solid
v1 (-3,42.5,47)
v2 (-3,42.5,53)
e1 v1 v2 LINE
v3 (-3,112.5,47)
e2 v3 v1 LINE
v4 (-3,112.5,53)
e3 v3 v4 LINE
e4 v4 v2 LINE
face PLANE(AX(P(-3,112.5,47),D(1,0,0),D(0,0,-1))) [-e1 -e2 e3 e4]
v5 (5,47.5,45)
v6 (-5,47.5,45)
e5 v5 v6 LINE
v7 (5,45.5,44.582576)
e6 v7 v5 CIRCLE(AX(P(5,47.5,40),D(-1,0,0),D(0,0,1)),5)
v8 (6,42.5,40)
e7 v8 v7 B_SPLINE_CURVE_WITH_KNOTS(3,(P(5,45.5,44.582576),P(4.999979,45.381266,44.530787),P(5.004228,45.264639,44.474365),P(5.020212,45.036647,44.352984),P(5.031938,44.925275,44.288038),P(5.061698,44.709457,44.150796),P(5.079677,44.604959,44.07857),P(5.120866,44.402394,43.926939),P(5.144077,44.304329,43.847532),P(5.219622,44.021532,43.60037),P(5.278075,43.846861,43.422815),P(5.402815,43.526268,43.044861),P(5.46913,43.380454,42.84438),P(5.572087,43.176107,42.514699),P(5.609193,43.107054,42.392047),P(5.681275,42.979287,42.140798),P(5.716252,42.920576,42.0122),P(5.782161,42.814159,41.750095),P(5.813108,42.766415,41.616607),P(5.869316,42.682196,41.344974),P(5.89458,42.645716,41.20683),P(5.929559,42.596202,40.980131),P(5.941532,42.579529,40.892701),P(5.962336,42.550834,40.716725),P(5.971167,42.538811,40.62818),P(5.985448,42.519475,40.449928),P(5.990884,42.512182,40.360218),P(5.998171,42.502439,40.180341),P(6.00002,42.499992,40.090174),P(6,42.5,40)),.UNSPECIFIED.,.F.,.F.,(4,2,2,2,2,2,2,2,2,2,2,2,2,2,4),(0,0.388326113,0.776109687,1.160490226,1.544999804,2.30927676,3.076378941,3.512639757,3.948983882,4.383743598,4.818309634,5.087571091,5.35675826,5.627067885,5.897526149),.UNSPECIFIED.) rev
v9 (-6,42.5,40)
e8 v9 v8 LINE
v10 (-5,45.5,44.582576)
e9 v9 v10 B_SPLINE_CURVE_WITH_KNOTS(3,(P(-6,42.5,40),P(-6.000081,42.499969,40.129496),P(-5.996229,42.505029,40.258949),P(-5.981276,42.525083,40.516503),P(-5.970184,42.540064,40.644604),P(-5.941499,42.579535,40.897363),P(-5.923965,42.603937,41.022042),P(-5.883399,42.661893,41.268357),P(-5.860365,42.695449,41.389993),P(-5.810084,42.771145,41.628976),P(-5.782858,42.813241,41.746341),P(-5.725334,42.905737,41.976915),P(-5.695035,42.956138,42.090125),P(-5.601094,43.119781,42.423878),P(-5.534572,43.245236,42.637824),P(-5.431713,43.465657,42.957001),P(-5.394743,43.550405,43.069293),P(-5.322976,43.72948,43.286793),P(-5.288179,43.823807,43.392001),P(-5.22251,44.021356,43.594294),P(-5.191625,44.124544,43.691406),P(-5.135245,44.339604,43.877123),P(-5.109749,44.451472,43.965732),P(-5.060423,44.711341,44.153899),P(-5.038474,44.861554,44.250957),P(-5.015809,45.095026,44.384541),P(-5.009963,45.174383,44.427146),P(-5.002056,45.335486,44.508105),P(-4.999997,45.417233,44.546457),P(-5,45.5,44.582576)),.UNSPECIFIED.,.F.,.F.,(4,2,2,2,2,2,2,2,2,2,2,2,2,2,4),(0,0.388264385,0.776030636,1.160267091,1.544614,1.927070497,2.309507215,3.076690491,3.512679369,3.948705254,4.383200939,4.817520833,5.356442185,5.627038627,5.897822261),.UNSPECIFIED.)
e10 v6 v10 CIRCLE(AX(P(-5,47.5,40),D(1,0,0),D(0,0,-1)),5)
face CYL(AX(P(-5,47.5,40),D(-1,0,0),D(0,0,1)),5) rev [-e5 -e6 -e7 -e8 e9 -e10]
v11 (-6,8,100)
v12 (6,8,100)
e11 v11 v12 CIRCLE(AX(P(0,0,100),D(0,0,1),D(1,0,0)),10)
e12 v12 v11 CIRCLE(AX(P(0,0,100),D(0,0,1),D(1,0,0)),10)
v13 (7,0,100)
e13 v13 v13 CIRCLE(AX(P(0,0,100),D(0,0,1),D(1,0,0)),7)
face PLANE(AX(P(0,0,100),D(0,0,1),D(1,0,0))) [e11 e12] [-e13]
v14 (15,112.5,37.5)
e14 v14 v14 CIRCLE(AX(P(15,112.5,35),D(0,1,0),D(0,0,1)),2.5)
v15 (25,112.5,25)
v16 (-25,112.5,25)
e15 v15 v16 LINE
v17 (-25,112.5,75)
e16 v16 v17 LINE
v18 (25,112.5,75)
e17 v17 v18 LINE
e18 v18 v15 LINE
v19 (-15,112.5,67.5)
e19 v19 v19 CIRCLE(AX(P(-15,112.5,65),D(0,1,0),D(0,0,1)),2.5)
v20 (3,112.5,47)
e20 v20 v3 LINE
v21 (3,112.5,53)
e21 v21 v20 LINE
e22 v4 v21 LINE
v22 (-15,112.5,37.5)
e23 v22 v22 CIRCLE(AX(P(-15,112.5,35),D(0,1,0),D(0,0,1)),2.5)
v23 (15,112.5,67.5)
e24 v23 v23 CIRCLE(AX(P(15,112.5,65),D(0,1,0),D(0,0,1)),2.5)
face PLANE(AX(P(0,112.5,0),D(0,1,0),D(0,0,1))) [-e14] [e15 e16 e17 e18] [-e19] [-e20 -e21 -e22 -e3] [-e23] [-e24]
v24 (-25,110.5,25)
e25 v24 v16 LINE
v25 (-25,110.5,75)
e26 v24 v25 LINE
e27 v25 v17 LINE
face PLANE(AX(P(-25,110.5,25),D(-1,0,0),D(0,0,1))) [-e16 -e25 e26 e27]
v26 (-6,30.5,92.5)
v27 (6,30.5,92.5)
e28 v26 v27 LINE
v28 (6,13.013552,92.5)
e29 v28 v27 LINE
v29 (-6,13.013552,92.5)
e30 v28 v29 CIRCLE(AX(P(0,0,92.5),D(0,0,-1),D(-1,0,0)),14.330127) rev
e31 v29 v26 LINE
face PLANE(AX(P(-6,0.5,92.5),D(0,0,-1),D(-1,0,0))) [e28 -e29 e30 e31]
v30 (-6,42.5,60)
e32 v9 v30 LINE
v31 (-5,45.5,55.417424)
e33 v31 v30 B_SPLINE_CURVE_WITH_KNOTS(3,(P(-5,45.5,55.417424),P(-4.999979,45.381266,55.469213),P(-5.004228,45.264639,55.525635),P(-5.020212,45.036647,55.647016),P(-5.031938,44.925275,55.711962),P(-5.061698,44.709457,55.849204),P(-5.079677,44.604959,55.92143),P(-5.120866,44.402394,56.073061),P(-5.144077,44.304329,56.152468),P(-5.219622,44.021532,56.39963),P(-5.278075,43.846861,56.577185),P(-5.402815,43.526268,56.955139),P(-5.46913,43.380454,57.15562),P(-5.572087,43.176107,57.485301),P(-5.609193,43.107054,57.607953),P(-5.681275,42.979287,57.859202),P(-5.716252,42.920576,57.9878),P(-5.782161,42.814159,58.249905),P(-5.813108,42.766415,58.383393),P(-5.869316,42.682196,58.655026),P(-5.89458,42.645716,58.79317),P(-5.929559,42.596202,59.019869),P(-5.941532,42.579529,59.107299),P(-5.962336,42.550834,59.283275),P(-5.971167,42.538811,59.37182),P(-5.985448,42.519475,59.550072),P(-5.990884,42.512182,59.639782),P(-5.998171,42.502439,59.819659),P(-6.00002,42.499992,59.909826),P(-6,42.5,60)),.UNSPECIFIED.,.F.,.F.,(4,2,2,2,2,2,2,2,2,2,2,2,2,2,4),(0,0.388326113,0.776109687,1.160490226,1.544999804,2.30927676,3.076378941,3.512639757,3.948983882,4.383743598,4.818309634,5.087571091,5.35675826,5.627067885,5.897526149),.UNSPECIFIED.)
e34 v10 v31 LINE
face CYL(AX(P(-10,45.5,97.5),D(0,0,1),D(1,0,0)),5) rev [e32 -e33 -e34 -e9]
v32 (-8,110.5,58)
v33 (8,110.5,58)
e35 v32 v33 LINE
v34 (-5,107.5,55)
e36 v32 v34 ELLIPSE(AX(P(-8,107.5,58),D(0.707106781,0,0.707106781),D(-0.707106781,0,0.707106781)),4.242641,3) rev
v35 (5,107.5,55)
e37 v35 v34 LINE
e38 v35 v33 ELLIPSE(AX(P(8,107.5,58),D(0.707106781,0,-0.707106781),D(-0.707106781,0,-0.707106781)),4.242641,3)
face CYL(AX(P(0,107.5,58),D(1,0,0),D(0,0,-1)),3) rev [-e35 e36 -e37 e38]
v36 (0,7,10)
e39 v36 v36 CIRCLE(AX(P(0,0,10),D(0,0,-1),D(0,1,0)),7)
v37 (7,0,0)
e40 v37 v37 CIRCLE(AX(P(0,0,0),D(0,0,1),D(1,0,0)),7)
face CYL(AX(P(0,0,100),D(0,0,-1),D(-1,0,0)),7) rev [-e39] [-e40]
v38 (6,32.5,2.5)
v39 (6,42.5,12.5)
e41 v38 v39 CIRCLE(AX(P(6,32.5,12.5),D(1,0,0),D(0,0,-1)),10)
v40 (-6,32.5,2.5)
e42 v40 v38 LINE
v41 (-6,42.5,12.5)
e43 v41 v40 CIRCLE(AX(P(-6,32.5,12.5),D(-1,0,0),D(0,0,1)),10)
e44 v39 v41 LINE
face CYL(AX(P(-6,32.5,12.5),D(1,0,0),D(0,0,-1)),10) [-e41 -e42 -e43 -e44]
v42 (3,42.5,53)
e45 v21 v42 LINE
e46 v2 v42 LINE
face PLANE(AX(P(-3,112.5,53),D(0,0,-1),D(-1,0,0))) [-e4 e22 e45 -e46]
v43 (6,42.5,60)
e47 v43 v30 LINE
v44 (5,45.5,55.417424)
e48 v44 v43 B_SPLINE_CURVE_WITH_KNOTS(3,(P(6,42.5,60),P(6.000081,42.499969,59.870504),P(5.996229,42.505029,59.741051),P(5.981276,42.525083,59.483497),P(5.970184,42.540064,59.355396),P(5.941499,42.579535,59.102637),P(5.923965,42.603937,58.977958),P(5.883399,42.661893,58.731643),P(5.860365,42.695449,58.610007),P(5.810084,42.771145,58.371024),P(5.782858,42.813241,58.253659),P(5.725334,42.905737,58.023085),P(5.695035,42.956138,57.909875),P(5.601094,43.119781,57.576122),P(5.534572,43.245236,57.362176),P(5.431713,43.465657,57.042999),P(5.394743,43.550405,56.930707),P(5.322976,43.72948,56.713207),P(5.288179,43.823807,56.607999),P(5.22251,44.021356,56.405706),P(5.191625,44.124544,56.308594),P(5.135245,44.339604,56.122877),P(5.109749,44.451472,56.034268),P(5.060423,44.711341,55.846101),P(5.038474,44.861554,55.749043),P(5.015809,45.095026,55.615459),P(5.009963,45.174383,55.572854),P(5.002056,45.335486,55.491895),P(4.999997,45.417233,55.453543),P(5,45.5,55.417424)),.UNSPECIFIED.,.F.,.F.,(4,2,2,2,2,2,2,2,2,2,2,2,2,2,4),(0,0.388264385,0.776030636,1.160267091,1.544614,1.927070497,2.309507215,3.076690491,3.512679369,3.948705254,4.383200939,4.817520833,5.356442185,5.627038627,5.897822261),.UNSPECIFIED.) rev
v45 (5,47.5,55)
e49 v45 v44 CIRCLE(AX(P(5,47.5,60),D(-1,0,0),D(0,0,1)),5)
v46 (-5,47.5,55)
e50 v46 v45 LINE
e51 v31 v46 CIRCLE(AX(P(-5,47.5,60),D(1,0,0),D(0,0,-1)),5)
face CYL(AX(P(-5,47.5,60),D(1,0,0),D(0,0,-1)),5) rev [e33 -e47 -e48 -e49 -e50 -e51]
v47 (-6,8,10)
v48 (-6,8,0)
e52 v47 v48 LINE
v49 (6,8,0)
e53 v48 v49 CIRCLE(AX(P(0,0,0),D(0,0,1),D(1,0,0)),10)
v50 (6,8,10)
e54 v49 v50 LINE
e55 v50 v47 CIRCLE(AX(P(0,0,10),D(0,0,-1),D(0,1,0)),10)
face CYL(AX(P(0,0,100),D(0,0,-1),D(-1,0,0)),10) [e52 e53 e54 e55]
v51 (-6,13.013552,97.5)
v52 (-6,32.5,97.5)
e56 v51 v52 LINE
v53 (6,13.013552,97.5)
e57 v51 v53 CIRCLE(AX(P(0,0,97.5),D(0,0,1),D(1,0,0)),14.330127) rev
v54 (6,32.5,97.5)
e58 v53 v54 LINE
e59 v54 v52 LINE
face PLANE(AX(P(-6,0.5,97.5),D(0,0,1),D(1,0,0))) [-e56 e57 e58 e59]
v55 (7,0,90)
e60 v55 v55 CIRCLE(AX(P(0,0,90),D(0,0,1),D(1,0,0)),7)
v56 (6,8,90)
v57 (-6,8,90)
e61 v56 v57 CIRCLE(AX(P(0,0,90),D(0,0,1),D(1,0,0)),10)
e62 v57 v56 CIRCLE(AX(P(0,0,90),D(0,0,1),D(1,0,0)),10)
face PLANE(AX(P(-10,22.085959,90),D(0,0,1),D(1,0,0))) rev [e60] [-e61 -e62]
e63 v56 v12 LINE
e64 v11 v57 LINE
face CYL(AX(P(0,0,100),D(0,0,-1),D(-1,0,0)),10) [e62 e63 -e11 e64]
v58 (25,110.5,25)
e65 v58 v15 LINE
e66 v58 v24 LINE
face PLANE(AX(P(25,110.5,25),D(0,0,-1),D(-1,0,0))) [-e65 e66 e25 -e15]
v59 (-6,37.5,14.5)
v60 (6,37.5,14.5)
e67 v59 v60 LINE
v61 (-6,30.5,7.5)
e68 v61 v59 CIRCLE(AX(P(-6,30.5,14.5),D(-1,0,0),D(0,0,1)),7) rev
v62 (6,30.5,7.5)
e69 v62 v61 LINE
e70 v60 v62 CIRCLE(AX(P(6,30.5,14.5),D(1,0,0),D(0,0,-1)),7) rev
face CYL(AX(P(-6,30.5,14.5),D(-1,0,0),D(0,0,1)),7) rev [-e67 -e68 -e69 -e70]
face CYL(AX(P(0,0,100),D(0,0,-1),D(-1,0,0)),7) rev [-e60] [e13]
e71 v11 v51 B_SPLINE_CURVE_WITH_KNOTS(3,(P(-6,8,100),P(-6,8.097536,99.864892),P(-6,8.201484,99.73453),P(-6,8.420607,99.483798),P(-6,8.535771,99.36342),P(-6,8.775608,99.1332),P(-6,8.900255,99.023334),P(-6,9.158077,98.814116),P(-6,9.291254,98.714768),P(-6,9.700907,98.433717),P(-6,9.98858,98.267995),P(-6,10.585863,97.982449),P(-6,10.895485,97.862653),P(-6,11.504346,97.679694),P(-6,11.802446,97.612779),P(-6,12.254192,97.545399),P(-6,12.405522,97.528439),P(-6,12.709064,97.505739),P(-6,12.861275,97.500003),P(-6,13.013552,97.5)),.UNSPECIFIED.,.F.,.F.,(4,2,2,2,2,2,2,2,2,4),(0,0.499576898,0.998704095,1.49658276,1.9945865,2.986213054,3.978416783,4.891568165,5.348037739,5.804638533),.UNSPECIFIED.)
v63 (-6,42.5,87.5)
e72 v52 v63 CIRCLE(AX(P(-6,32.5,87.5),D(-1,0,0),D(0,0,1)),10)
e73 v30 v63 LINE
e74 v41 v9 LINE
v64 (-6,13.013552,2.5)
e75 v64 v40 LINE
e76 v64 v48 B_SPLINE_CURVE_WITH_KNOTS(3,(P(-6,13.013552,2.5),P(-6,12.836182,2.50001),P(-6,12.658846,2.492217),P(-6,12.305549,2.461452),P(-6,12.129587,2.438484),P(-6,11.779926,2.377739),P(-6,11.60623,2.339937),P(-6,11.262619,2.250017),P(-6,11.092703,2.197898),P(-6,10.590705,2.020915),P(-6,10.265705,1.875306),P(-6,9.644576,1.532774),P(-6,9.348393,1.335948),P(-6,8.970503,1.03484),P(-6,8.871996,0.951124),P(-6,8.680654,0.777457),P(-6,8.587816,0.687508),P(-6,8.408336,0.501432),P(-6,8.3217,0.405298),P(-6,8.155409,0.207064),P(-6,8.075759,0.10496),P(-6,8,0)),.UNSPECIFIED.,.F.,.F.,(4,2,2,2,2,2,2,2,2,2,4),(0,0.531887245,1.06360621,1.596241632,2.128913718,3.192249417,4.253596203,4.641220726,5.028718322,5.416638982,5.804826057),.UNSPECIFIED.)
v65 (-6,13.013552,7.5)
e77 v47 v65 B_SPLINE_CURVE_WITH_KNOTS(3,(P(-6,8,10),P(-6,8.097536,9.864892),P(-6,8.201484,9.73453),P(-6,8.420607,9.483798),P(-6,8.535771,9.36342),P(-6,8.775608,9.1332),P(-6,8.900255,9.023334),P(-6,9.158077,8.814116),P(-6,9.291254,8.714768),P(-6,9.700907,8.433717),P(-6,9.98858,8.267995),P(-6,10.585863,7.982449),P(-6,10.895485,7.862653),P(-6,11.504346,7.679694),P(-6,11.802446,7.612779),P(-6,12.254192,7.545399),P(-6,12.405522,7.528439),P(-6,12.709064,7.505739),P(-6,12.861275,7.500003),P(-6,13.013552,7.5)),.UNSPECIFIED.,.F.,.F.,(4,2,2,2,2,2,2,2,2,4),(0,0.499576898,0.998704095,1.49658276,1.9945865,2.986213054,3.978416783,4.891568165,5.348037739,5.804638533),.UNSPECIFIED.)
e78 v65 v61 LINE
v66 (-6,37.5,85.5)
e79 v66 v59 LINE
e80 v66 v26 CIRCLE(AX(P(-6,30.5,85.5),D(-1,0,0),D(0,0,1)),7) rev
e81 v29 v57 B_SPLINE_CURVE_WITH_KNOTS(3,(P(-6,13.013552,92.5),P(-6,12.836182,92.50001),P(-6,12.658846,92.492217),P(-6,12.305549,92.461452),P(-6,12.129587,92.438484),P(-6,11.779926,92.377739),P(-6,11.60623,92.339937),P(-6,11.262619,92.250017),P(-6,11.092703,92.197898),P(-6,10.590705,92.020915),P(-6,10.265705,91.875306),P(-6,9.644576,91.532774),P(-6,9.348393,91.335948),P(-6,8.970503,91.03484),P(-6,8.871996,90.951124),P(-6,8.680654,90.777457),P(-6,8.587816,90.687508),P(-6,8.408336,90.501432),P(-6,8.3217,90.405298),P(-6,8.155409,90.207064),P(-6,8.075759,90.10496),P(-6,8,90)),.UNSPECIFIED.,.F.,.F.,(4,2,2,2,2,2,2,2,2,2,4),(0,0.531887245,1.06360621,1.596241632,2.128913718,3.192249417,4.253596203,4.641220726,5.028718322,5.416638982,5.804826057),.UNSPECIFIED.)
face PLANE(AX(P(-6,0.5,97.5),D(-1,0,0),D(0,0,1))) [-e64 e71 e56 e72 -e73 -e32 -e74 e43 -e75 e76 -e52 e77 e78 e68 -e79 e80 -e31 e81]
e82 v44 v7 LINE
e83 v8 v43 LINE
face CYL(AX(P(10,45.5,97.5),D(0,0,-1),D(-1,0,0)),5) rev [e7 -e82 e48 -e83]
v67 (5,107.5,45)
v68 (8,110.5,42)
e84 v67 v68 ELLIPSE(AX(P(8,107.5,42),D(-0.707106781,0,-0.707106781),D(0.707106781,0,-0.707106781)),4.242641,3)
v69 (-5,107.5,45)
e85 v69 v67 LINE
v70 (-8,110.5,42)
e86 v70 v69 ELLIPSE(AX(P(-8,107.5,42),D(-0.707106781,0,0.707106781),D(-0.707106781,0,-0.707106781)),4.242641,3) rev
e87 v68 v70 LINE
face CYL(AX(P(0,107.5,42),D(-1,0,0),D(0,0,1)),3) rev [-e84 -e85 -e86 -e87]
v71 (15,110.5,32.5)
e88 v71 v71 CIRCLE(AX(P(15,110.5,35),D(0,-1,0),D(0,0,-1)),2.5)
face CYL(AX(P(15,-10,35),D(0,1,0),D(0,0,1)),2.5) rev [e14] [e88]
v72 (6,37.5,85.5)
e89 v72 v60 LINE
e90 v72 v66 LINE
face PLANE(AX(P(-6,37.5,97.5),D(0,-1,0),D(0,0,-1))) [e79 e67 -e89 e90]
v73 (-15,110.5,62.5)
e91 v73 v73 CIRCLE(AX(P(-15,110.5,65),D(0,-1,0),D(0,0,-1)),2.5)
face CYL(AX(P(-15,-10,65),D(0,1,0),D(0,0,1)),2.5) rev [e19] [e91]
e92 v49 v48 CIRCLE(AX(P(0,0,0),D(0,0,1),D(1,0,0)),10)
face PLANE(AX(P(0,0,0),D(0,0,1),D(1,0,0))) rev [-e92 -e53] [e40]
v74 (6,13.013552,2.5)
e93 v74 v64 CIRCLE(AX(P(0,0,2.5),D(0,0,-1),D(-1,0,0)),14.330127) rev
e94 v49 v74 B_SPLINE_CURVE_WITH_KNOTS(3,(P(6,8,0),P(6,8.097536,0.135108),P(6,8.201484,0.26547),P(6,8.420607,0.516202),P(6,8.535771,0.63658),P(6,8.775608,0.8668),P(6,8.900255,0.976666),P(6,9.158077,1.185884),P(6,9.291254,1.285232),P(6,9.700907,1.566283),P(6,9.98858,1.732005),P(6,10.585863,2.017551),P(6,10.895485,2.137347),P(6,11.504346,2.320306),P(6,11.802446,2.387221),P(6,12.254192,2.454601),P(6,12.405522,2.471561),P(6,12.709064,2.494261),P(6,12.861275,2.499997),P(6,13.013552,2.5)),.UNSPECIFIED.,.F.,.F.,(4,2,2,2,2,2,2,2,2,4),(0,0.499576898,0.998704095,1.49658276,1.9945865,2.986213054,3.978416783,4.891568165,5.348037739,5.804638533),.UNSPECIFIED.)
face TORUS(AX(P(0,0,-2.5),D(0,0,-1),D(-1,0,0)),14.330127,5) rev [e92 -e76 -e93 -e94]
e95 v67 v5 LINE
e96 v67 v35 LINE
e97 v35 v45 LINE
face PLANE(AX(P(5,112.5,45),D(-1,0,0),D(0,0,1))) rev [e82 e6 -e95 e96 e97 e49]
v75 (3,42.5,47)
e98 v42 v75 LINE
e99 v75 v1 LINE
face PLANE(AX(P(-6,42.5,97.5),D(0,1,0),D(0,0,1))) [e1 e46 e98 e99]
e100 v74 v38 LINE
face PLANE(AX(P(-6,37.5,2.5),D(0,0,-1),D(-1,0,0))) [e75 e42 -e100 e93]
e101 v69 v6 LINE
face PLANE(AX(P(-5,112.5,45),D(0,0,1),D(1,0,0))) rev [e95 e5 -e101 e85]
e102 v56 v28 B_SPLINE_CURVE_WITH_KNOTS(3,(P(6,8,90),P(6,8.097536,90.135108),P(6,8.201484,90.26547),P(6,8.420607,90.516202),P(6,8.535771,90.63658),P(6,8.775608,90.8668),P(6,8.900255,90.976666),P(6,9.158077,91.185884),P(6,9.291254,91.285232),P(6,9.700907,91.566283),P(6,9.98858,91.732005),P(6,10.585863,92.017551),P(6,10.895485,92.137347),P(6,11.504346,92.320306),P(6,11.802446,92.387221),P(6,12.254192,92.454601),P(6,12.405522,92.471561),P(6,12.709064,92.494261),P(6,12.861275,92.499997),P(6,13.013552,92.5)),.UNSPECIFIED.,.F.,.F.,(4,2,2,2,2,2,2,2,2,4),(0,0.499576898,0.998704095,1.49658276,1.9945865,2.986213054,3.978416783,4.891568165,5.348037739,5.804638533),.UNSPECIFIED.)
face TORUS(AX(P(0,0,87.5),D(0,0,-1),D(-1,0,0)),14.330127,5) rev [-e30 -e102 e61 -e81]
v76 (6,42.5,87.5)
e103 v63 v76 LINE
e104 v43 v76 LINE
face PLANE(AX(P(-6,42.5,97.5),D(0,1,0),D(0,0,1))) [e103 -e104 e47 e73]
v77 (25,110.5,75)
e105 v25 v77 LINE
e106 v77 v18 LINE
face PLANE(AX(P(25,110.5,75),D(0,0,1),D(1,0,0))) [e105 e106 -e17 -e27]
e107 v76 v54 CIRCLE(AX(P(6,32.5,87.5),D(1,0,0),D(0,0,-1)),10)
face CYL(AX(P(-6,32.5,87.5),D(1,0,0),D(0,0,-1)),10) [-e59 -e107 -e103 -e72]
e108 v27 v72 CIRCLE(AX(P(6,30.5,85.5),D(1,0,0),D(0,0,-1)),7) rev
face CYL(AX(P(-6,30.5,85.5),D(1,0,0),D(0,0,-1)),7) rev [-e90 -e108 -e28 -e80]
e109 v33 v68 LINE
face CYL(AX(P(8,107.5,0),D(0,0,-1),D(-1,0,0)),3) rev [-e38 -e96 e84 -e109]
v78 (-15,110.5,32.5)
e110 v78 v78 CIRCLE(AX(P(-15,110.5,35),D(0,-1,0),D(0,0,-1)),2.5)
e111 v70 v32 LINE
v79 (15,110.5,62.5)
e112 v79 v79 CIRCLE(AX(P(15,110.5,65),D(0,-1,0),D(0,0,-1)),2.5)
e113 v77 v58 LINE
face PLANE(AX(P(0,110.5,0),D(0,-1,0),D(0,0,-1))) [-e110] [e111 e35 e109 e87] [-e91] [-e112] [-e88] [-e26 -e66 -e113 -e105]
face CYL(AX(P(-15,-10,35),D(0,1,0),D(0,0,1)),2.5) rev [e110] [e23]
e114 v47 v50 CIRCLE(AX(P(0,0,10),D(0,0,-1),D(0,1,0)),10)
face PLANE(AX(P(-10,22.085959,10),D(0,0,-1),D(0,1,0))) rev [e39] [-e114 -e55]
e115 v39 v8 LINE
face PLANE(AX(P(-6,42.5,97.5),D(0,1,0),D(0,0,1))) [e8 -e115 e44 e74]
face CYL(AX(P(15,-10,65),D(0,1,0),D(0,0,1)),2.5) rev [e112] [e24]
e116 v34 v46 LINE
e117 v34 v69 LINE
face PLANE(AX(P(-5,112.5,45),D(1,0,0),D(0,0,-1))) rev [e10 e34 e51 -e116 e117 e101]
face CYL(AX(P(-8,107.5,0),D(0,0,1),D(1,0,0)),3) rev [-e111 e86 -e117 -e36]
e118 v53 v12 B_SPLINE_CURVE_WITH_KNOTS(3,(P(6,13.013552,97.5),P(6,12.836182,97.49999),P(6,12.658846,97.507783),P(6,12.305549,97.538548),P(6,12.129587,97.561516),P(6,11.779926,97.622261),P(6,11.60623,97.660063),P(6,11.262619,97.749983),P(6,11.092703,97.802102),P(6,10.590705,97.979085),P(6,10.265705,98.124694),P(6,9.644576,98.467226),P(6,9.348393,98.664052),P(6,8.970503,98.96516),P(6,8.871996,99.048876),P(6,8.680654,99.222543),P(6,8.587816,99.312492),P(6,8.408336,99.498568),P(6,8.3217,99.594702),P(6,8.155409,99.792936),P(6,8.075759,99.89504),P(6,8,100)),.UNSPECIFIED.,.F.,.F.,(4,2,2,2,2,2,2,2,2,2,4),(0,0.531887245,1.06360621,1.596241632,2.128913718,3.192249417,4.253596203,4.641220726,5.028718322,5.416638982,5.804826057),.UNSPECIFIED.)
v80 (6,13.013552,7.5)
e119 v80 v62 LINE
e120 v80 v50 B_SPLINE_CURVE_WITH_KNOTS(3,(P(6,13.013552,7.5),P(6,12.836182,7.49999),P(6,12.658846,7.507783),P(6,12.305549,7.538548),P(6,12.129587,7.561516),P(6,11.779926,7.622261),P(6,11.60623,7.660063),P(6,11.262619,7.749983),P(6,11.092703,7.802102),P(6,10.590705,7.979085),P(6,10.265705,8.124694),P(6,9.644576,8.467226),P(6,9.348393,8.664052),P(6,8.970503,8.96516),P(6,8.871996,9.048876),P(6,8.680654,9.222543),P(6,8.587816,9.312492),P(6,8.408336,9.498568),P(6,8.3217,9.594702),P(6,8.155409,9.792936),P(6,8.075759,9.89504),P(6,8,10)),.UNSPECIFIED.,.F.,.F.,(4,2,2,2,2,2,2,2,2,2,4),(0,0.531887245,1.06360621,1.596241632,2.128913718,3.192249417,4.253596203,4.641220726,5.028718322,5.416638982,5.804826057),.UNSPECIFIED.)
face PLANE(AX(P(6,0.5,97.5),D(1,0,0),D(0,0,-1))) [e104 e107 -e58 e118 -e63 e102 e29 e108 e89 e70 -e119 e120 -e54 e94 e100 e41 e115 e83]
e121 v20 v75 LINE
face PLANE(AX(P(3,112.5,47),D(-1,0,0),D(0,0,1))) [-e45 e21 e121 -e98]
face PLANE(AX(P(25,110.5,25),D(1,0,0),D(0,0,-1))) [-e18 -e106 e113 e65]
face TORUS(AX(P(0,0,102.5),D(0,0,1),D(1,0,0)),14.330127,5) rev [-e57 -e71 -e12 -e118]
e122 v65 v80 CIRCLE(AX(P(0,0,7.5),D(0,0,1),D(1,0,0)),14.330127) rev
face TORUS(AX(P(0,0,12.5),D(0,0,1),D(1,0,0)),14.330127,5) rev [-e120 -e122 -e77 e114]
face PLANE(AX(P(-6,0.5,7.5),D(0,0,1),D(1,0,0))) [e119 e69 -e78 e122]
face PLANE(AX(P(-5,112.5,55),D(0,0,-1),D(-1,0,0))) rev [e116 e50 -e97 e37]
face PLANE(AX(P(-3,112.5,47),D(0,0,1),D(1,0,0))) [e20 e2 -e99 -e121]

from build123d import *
from OCP.BRepFilletAPI import BRepFilletAPI_MakeFillet

# Parameters (mm, degrees)
SKETCH1_R               = 10
SKETCH1_R_2             = 7
BOSS_EXTRUDE1_DEPTH     = 100
CUT_EXTRUDE1_DEPTH      = 101.995049384
CUT_EXTRUDE1_DEPTH_BACK = 101.995049384
SKETCH2_W               = 80
SKETCH2_H               = 53.3052099
SKETCH3_W               = 12
SKETCH3_H               = 5
BOSS_EXTRUDE2_DEPTH     = 37
CUT_EXTRUDE2_DEPTH      = 105
SKETCH5_W               = 95
SKETCH5_H               = 5
BOSS_EXTRUDE3_DEPTH     = 12
FILLET1_R1              = 10
FILLET1_R2              = 7
SKETCH6_W               = 10
SKETCH6_H               = 10
SKETCH6_W_2             = 6
SKETCH6_H_2             = 6
BOSS_EXTRUDE4_DEPTH     = 70
FILLET2_R               = 5
SKETCH7_W               = 50
SKETCH7_H               = 50
SKETCH7_W_2             = 10
SKETCH7_H_2             = 10
BOSS_EXTRUDE5_DEPTH     = 2
FILLET3_R               = 3
CUT_EXTRUDE3_DEPTH      = 161.097626528


with BuildPart() as part:
    # Sketch1 → Boss-Extrude1 (new body)
    with BuildSketch(Plane.XY):
        Circle(SKETCH1_R)
        Circle(SKETCH1_R_2, mode=Mode.SUBTRACT)
    extrude(amount=BOSS_EXTRUDE1_DEPTH)

    # Sketch2 → Cut-Extrude1 (cut, two sides: drawn at the far end of the back side and taken through both)
    with BuildSketch(Plane(origin=(0, 0, 0), x_dir=(0, 0, -1), z_dir=(1, 0, 0)).offset(-CUT_EXTRUDE1_DEPTH_BACK)):
        with Locations((-50, -4.566645708)):
            Rectangle(SKETCH2_W, SKETCH2_H)
    extrude(amount=CUT_EXTRUDE1_DEPTH + CUT_EXTRUDE1_DEPTH_BACK, mode=Mode.SUBTRACT)


with BuildPart() as cut_extrude1_piece_1:
    # of the separate pieces the step leaves, piece 1, a body of its own (cut_extrude1_pieces)
    add(part.part.solids().sort_by_distance((10, 0, 0))[0])



with BuildPart() as cut_extrude1_piece_2:
    # of the separate pieces the step leaves, piece 2, a body of its own (cut_extrude1_pieces)
    add(part.part.solids().sort_by_distance((10, 0, 90))[0])


with BuildPart() as cut_extrude1_piece_1_1:
    add(cut_extrude1_piece_1.part)

    add(cut_extrude1_piece_2.part)  # Boss-Extrude2 merges Cut-Extrude1 piece 2
    # Sketch3 → Boss-Extrude2 (add)
    with BuildSketch(Plane(origin=(0, 37.5, 0), x_dir=(1, 0, 0), z_dir=(0, 1, 0))):
        with Locations((0, -95)):
            Rectangle(SKETCH3_W, SKETCH3_H)
        with Locations((0, -5)):
            Rectangle(SKETCH3_W, SKETCH3_H)
    extrude(amount=-BOSS_EXTRUDE2_DEPTH)

    # Sketch4 → Cut-Extrude2 (cut)
    with BuildSketch(Plane.XY.offset(97.5)):
        with BuildLine():
            Line((-6, 0.5), (6, 0.5))
            Line((6, 0.5), (6, 3.605551275))
            ThreePointArc((6, 3.605551275), (0, 7), (-6, 3.605551275))
            Line((-6, 3.605551275), (-6, 0.5))
        make_face()
    extrude(amount=-CUT_EXTRUDE2_DEPTH, mode=Mode.SUBTRACT)

    # Sketch5 → Boss-Extrude3 (add)
    with BuildSketch(Plane(origin=(6, 0, 0), x_dir=(0, 0, -1), z_dir=(1, 0, 0))):
        with Locations((-50, 40)):
            Rectangle(SKETCH5_W, SKETCH5_H)
    extrude(amount=-BOSS_EXTRUDE3_DEPTH)

    # Fillet1: one fillet with a radius per group of edges: ONE call of the kernel's fillet builder (fillet() takes one radius for all edges)
    fillet1_edges_1 = [cut_extrude1_piece_1_1.edges().sort_by_distance(p)[0] for p in [
        (0, 42.5, 97.5),
        (0, 42.5, 2.5),
    ]]
    fillet1_edges_2 = [cut_extrude1_piece_1_1.edges().sort_by_distance(p)[0] for p in [
        (0, 37.5, 92.5),
        (0, 37.5, 7.5),
    ]]
    fillet1 = BRepFilletAPI_MakeFillet(cut_extrude1_piece_1_1.part.solid().wrapped)
    for e in fillet1_edges_1:
        fillet1.Add(FILLET1_R1, e.wrapped)
    for e in fillet1_edges_2:
        fillet1.Add(FILLET1_R2, e.wrapped)
    add(Compound.cast(fillet1.Shape()), mode=Mode.REPLACE)

    # Sketch6 → Boss-Extrude4 (add)
    with BuildSketch(Plane(origin=(0, 42.5, 0), x_dir=(1, 0, 0), z_dir=(0, 1, 0))):
        with Locations((0, -50)):
            Rectangle(SKETCH6_W, SKETCH6_H)
        with Locations((0, -50)):
            Rectangle(SKETCH6_W_2, SKETCH6_H_2, mode=Mode.SUBTRACT)
    extrude(amount=BOSS_EXTRUDE4_DEPTH)

    # Fillet2
    # the kernel refuses this fillet: 5 mm, written as the material it adds along each edge
    with BuildSketch(Plane(origin=(0, 0, 97.5), x_dir=(-0.9879298131416905, -0.15490217656903477, 0), z_dir=(0.15490217656903477, -0.9879298131416905, 0))) as fillet2_piece_1_section:
        with BuildLine():
            CenterArc((14.330127019, -5), FILLET2_R, 90, 60)
            Line((10, -2.5), (9.91339746, -2.45))
            ThreePointArc((9.91339746, -2.45), (9.9, -1.25), (9.9, 0))
            Line((9.9, 0), (10, 0.1))
            Line((10, 0.1), (14.330127019, 0.1))
            Line((14.330127019, 0.1), (14.330127019, 0))
        make_face()
    fillet2_piece_1 = revolve(axis=Axis((0, 0, 97.5), (0, 0, -1)), revolution_arc=197.822245722, mode=Mode.PRIVATE)
    fillet2_piece_1 = split(fillet2_piece_1, bisect_by=Plane(origin=(6, 10.469703394, 98.151254793), z_dir=(-1, 0, 0)), keep=Keep.TOP, mode=Mode.PRIVATE)
    fillet2_piece_1 = split(fillet2_piece_1, bisect_by=Plane(origin=(-6, 10.469703394, 98.151254793), z_dir=(1, 0, 0)), keep=Keep.TOP, mode=Mode.PRIVATE)
    add(fillet2_piece_1)
    with BuildSketch(Plane(origin=(0, 0, 92.5), x_dir=(-0.9879298131416903, -0.15490217656903651, 0), z_dir=(0.15490217656903651, -0.9879298131416903, 0))) as fillet2_piece_2_section:
        with BuildLine():
            CenterArc((14.330127019, 5), FILLET2_R, 210, 60)
            Line((14.330127019, 0), (14.330127019, -0.1))
            Line((14.330127019, -0.1), (10, -0.1))
            Line((10, -0.1), (9.9, 0))
            ThreePointArc((9.9, 0), (9.9, 1.25), (9.91339746, 2.45))
            Line((9.91339746, 2.45), (10, 2.5))
        make_face()
    fillet2_piece_2 = revolve(axis=Axis((0, 0, 92.5), (0, 0, -1)), revolution_arc=197.822245722, mode=Mode.PRIVATE)
    fillet2_piece_2 = split(fillet2_piece_2, bisect_by=Plane(origin=(6, 10.469703394, 91.848745207), z_dir=(-1, 0, 0)), keep=Keep.TOP, mode=Mode.PRIVATE)
    fillet2_piece_2 = split(fillet2_piece_2, bisect_by=Plane(origin=(-6, 10.469703394, 91.848745207), z_dir=(1, 0, 0)), keep=Keep.TOP, mode=Mode.PRIVATE)
    add(fillet2_piece_2)
    with BuildSketch(Plane(origin=(0, 0, 2.5), x_dir=(-0.98792981314169, -0.1549021765690374, 0), z_dir=(0.1549021765690374, -0.98792981314169, 0))) as fillet2_piece_3_section:
        with BuildLine():
            CenterArc((14.330127019, 5), FILLET2_R, 210, 60)
            Line((14.330127019, 0), (14.330127019, -0.1))
            Line((14.330127019, -0.1), (10, -0.1))
            Line((10, -0.1), (9.9, 0))
            ThreePointArc((9.9, 0), (9.9, 1.25), (9.91339746, 2.45))
            Line((9.91339746, 2.45), (10, 2.5))
        make_face()
    fillet2_piece_3 = revolve(axis=Axis((0, 0, 2.5), (0, 0, -1)), revolution_arc=197.822245722, mode=Mode.PRIVATE)
    fillet2_piece_3 = split(fillet2_piece_3, bisect_by=Plane(origin=(6, 10.469703394, 1.848745207), z_dir=(-1, 0, 0)), keep=Keep.TOP, mode=Mode.PRIVATE)
    fillet2_piece_3 = split(fillet2_piece_3, bisect_by=Plane(origin=(-6, 10.469703394, 1.848745207), z_dir=(1, 0, 0)), keep=Keep.TOP, mode=Mode.PRIVATE)
    add(fillet2_piece_3)
    with BuildSketch(Plane(origin=(0, 0, 7.5), x_dir=(-0.9879298131416905, -0.15490217656903565, 0), z_dir=(0.15490217656903565, -0.9879298131416905, 0))) as fillet2_piece_4_section:
        with BuildLine():
            CenterArc((14.330127019, -5), FILLET2_R, 90, 60)
            Line((10, -2.5), (9.91339746, -2.45))
            ThreePointArc((9.91339746, -2.45), (9.9, -1.25), (9.9, 0))
            Line((9.9, 0), (10, 0.1))
            Line((10, 0.1), (14.330127019, 0.1))
            Line((14.330127019, 0.1), (14.330127019, 0))
        make_face()
    fillet2_piece_4 = revolve(axis=Axis((0, 0, 7.5), (0, 0, -1)), revolution_arc=197.822245722, mode=Mode.PRIVATE)
    fillet2_piece_4 = split(fillet2_piece_4, bisect_by=Plane(origin=(6, 10.469703394, 8.151254793), z_dir=(-1, 0, 0)), keep=Keep.TOP, mode=Mode.PRIVATE)
    fillet2_piece_4 = split(fillet2_piece_4, bisect_by=Plane(origin=(-6, 10.469703394, 8.151254793), z_dir=(1, 0, 0)), keep=Keep.TOP, mode=Mode.PRIVATE)
    add(fillet2_piece_4)
    with BuildSketch(Plane(origin=(5, 42.5, 45), x_dir=(1, 0, 0), z_dir=(0, 0, 1)), Plane(origin=(-5, 42.5, 55), x_dir=(-1, 0, 0), z_dir=(0, 0, -1))) as fillet2_piece_5:
        with BuildLine():
            CenterArc((5, 3), FILLET2_R, 180, 36.869897646)
            Line((0, 3), (-0.1, 3))
            Line((-0.1, 3), (-0.1, 0))
            Line((-0.1, 0), (0, -0.1))
            ThreePointArc((0, -0.1), (0.5, -0.1), (0.92, -0.06))
            Line((0.92, -0.06), (1, 0))
        make_face()
    extrude(amount=10)
    with BuildSketch(Plane(origin=(5, 42.5, 55), x_dir=(0, 0, 1), z_dir=(-1, 0, 0)), Plane(origin=(-5, 42.5, 45), x_dir=(0, 0, -1), z_dir=(1, 0, 0))) as fillet2_piece_6:
        with BuildLine():
            CenterArc((FILLET2_R, FILLET2_R), FILLET2_R, 180, 90)
            Line((0, FILLET2_R), (-FILLET2_R * 0.02, FILLET2_R))
            Line((-FILLET2_R * 0.02, FILLET2_R), (-FILLET2_R * 0.02, -FILLET2_R * 0.02))
            Line((-FILLET2_R * 0.02, -FILLET2_R * 0.02), (FILLET2_R, -FILLET2_R * 0.02))
            Line((FILLET2_R, -FILLET2_R * 0.02), (FILLET2_R, 0))
        make_face()
    extrude(amount=10)
    with BuildSketch(Plane(origin=(5, 42.5, 37.5), x_dir=(1, 0, 0), z_dir=(0, 0, 1))) as fillet2_piece_7a_section:
        with BuildLine():
            CenterArc((5, 3), FILLET2_R, 180, 36.869897646)
            Line((0, 3), (-0.1, 3))
            Line((-0.1, 3), (-0.1, 0))
            Line((-0.1, 0), (0, -0.1))
            ThreePointArc((0, -0.1), (0.5, -0.1), (0.92, -0.06))
            Line((0.92, -0.06), (1, 0))
        make_face()
    fillet2_piece_7a = extrude(amount=17.5, mode=Mode.PRIVATE)
    fillet2_piece_7a = split(fillet2_piece_7a, bisect_by=Plane(origin=(5.226188398, 43.349672813, 45), z_dir=(0, 0, -1)), keep=Keep.TOP, mode=Mode.PRIVATE)
    with BuildSketch(Plane(origin=(-5, 42.5, 45), x_dir=(0, 0, -1), z_dir=(1, 0, 0))) as fillet2_piece_7b_section:
        with BuildLine():
            CenterArc((FILLET2_R, FILLET2_R), FILLET2_R, 180, 90)
            Line((0, FILLET2_R), (-FILLET2_R * 0.02, FILLET2_R))
            Line((-FILLET2_R * 0.02, FILLET2_R), (-FILLET2_R * 0.02, -FILLET2_R * 0.02))
            Line((-FILLET2_R * 0.02, -FILLET2_R * 0.02), (FILLET2_R, -FILLET2_R * 0.02))
            Line((FILLET2_R, -FILLET2_R * 0.02), (FILLET2_R, 0))
        make_face()
    fillet2_piece_7b = extrude(amount=22.5, mode=Mode.PRIVATE)
    fillet2_piece_7b = split(fillet2_piece_7b, bisect_by=Plane(origin=(6, 43.631975571, 43.868024429), z_dir=(-1, 0, 0)), keep=Keep.TOP, mode=Mode.PRIVATE)
    fillet2_piece_7b = split(fillet2_piece_7b, bisect_by=Plane(origin=(5, 43.631975571, 43.868024429), z_dir=(1, 0, 0)), keep=Keep.TOP, mode=Mode.PRIVATE)
    fillet2_piece_7 = fillet2_piece_7a & fillet2_piece_7b
    add(fillet2_piece_7)
    with BuildSketch(Plane(origin=(17.5, 42.5, 55), x_dir=(0, 0, 1), z_dir=(-1, 0, 0))) as fillet2_piece_8a_section:
        with BuildLine():
            CenterArc((FILLET2_R, FILLET2_R), FILLET2_R, 180, 90)
            Line((0, FILLET2_R), (-FILLET2_R * 0.02, FILLET2_R))
            Line((-FILLET2_R * 0.02, FILLET2_R), (-FILLET2_R * 0.02, -FILLET2_R * 0.02))
            Line((-FILLET2_R * 0.02, -FILLET2_R * 0.02), (FILLET2_R, -FILLET2_R * 0.02))
            Line((FILLET2_R, -FILLET2_R * 0.02), (FILLET2_R, 0))
        make_face()
    fillet2_piece_8a = extrude(amount=22.5, mode=Mode.PRIVATE)
    fillet2_piece_8a = split(fillet2_piece_8a, bisect_by=Plane(origin=(6, 43.631975571, 56.131975571), z_dir=(-1, 0, 0)), keep=Keep.TOP, mode=Mode.PRIVATE)
    fillet2_piece_8a = split(fillet2_piece_8a, bisect_by=Plane(origin=(5, 43.631975571, 56.131975571), z_dir=(1, 0, 0)), keep=Keep.TOP, mode=Mode.PRIVATE)
    with BuildSketch(Plane(origin=(5, 42.5, 45), x_dir=(1, 0, 0), z_dir=(0, 0, 1))) as fillet2_piece_8b_section:
        with BuildLine():
            CenterArc((5, 3), FILLET2_R, 180, 36.869897646)
            Line((0, 3), (-0.1, 3))
            Line((-0.1, 3), (-0.1, 0))
            Line((-0.1, 0), (0, -0.1))
            ThreePointArc((0, -0.1), (0.5, -0.1), (0.92, -0.06))
            Line((0.92, -0.06), (1, 0))
        make_face()
    fillet2_piece_8b = extrude(amount=17.5, mode=Mode.PRIVATE)
    fillet2_piece_8b = split(fillet2_piece_8b, bisect_by=Plane(origin=(5.226188398, 43.349672813, 55), z_dir=(0, 0, 1)), keep=Keep.TOP, mode=Mode.PRIVATE)
    fillet2_piece_8 = fillet2_piece_8a & fillet2_piece_8b
    add(fillet2_piece_8)
    with BuildSketch(Plane(origin=(-5, 42.5, 62.5), x_dir=(-1, 0, 0), z_dir=(0, 0, -1))) as fillet2_piece_9a_section:
        with BuildLine():
            CenterArc((5, 3), FILLET2_R, 180, 36.869897646)
            Line((0, 3), (-0.1, 3))
            Line((-0.1, 3), (-0.1, 0))
            Line((-0.1, 0), (0, -0.1))
            ThreePointArc((0, -0.1), (0.5, -0.1), (0.92, -0.06))
            Line((0.92, -0.06), (1, 0))
        make_face()
    fillet2_piece_9a = extrude(amount=17.5, mode=Mode.PRIVATE)
    fillet2_piece_9a = split(fillet2_piece_9a, bisect_by=Plane(origin=(-5.226188398, 43.349672813, 55), z_dir=(0, 0, 1)), keep=Keep.TOP, mode=Mode.PRIVATE)
    with BuildSketch(Plane(origin=(5, 42.5, 55), x_dir=(0, 0, 1), z_dir=(-1, 0, 0))) as fillet2_piece_9b_section:
        with BuildLine():
            CenterArc((FILLET2_R, FILLET2_R), FILLET2_R, 180, 90)
            Line((0, FILLET2_R), (-FILLET2_R * 0.02, FILLET2_R))
            Line((-FILLET2_R * 0.02, FILLET2_R), (-FILLET2_R * 0.02, -FILLET2_R * 0.02))
            Line((-FILLET2_R * 0.02, -FILLET2_R * 0.02), (FILLET2_R, -FILLET2_R * 0.02))
            Line((FILLET2_R, -FILLET2_R * 0.02), (FILLET2_R, 0))
        make_face()
    fillet2_piece_9b = extrude(amount=22.5, mode=Mode.PRIVATE)
    fillet2_piece_9b = split(fillet2_piece_9b, bisect_by=Plane(origin=(-6, 43.631975571, 56.131975571), z_dir=(1, 0, 0)), keep=Keep.TOP, mode=Mode.PRIVATE)
    fillet2_piece_9b = split(fillet2_piece_9b, bisect_by=Plane(origin=(-5, 43.631975571, 56.131975571), z_dir=(-1, 0, 0)), keep=Keep.TOP, mode=Mode.PRIVATE)
    fillet2_piece_9 = fillet2_piece_9a & fillet2_piece_9b
    add(fillet2_piece_9)
    with BuildSketch(Plane(origin=(-5, 42.5, 55), x_dir=(-1, 0, 0), z_dir=(0, 0, -1))) as fillet2_piece_10a_section:
        with BuildLine():
            CenterArc((5, 3), FILLET2_R, 180, 36.869897646)
            Line((0, 3), (-0.1, 3))
            Line((-0.1, 3), (-0.1, 0))
            Line((-0.1, 0), (0, -0.1))
            ThreePointArc((0, -0.1), (0.5, -0.1), (0.92, -0.06))
            Line((0.92, -0.06), (1, 0))
        make_face()
    fillet2_piece_10a = extrude(amount=17.5, mode=Mode.PRIVATE)
    fillet2_piece_10a = split(fillet2_piece_10a, bisect_by=Plane(origin=(-5.226188398, 43.349672813, 45), z_dir=(0, 0, -1)), keep=Keep.TOP, mode=Mode.PRIVATE)
    with BuildSketch(Plane(origin=(-17.5, 42.5, 45), x_dir=(0, 0, -1), z_dir=(1, 0, 0))) as fillet2_piece_10b_section:
        with BuildLine():
            CenterArc((FILLET2_R, FILLET2_R), FILLET2_R, 180, 90)
            Line((0, FILLET2_R), (-FILLET2_R * 0.02, FILLET2_R))
            Line((-FILLET2_R * 0.02, FILLET2_R), (-FILLET2_R * 0.02, -FILLET2_R * 0.02))
            Line((-FILLET2_R * 0.02, -FILLET2_R * 0.02), (FILLET2_R, -FILLET2_R * 0.02))
            Line((FILLET2_R, -FILLET2_R * 0.02), (FILLET2_R, 0))
        make_face()
    fillet2_piece_10b = extrude(amount=22.5, mode=Mode.PRIVATE)
    fillet2_piece_10b = split(fillet2_piece_10b, bisect_by=Plane(origin=(-6, 43.631975571, 43.868024429), z_dir=(1, 0, 0)), keep=Keep.TOP, mode=Mode.PRIVATE)
    fillet2_piece_10b = split(fillet2_piece_10b, bisect_by=Plane(origin=(-5, 43.631975571, 43.868024429), z_dir=(-1, 0, 0)), keep=Keep.TOP, mode=Mode.PRIVATE)
    fillet2_piece_10 = fillet2_piece_10a & fillet2_piece_10b
    add(fillet2_piece_10)

    # Sketch7 → Boss-Extrude5 (add)
    with BuildSketch(Plane(origin=(0, 112.5, 0), x_dir=(1, 0, 0), z_dir=(0, 1, 0))):
        with Locations((0, -50)):
            Rectangle(SKETCH7_W, SKETCH7_H)
        with Locations((0, -50)):
            Rectangle(SKETCH7_W_2, SKETCH7_H_2, mode=Mode.SUBTRACT)
    extrude(amount=-BOSS_EXTRUDE5_DEPTH)

    # Fillet3
    fillet3_edges = [cut_extrude1_piece_1_1.edges().sort_by_distance(p)[0] for p in [
        (5, 110.5, 50),
        (0, 110.5, 45),
        (-5, 110.5, 50),
        (0, 110.5, 55),
    ]]
    fillet(fillet3_edges, radius=FILLET3_R)

    # Sketch8 → Cut-Extrude3 (cut, through all)
    with BuildSketch(Plane(origin=(0, 112.5, 0), x_dir=(1, 0, 0), z_dir=(0, 1, 0))):
        with BuildLine():
            ThreePointArc((17.5, -65), (16.767766953, -63.232233047), (15, -62.5))
            Line((15, -62.5), (15, -65))
            Line((15, -65), (12.5, -65))
            ThreePointArc((12.5, -65), (15, -67.5), (17.5, -65))
        make_face()
        with BuildLine():
            Line((15, -65), (15, -62.5))
            ThreePointArc((15, -62.5), (13.232233047, -63.232233047), (12.5, -65))
            Line((12.5, -65), (15, -65))
        make_face()
        with BuildLine():
            ThreePointArc((17.5, -35), (15, -32.5), (12.5, -35))
            Line((12.5, -35), (15, -35))
            Line((15, -35), (15, -37.5))
            ThreePointArc((15, -37.5), (16.767766953, -36.767766953), (17.5, -35))
        make_face()
        with BuildLine():
            Line((15, -35), (12.5, -35))
            ThreePointArc((12.5, -35), (13.232233047, -36.767766953), (15, -37.5))
            Line((15, -37.5), (15, -35))
        make_face()
        with BuildLine():
            ThreePointArc((-15, -37.5), (-13.232233047, -36.767766953), (-12.5, -35))
            Line((-12.5, -35), (-15, -35))
            Line((-15, -35), (-15, -37.5))
        make_face()
        with BuildLine():
            Line((-15, -35), (-12.5, -35))
            ThreePointArc((-12.5, -35), (-16.767766953, -33.232233047), (-15, -37.5))
            Line((-15, -37.5), (-15, -35))
        make_face()
        with BuildLine():
            ThreePointArc((-12.5, -65), (-13.232233047, -63.232233047), (-15, -62.5))
            Line((-15, -62.5), (-15, -65))
            Line((-15, -65), (-12.5, -65))
        make_face()
        with BuildLine():
            Line((-15, -65), (-15, -62.5))
            ThreePointArc((-15, -62.5), (-16.767766953, -66.767766953), (-12.5, -65))
            Line((-12.5, -65), (-15, -65))
        make_face()
    extrude(amount=-CUT_EXTRUDE3_DEPTH, mode=Mode.SUBTRACT)


solid = cut_extrude1_piece_1_1.part
